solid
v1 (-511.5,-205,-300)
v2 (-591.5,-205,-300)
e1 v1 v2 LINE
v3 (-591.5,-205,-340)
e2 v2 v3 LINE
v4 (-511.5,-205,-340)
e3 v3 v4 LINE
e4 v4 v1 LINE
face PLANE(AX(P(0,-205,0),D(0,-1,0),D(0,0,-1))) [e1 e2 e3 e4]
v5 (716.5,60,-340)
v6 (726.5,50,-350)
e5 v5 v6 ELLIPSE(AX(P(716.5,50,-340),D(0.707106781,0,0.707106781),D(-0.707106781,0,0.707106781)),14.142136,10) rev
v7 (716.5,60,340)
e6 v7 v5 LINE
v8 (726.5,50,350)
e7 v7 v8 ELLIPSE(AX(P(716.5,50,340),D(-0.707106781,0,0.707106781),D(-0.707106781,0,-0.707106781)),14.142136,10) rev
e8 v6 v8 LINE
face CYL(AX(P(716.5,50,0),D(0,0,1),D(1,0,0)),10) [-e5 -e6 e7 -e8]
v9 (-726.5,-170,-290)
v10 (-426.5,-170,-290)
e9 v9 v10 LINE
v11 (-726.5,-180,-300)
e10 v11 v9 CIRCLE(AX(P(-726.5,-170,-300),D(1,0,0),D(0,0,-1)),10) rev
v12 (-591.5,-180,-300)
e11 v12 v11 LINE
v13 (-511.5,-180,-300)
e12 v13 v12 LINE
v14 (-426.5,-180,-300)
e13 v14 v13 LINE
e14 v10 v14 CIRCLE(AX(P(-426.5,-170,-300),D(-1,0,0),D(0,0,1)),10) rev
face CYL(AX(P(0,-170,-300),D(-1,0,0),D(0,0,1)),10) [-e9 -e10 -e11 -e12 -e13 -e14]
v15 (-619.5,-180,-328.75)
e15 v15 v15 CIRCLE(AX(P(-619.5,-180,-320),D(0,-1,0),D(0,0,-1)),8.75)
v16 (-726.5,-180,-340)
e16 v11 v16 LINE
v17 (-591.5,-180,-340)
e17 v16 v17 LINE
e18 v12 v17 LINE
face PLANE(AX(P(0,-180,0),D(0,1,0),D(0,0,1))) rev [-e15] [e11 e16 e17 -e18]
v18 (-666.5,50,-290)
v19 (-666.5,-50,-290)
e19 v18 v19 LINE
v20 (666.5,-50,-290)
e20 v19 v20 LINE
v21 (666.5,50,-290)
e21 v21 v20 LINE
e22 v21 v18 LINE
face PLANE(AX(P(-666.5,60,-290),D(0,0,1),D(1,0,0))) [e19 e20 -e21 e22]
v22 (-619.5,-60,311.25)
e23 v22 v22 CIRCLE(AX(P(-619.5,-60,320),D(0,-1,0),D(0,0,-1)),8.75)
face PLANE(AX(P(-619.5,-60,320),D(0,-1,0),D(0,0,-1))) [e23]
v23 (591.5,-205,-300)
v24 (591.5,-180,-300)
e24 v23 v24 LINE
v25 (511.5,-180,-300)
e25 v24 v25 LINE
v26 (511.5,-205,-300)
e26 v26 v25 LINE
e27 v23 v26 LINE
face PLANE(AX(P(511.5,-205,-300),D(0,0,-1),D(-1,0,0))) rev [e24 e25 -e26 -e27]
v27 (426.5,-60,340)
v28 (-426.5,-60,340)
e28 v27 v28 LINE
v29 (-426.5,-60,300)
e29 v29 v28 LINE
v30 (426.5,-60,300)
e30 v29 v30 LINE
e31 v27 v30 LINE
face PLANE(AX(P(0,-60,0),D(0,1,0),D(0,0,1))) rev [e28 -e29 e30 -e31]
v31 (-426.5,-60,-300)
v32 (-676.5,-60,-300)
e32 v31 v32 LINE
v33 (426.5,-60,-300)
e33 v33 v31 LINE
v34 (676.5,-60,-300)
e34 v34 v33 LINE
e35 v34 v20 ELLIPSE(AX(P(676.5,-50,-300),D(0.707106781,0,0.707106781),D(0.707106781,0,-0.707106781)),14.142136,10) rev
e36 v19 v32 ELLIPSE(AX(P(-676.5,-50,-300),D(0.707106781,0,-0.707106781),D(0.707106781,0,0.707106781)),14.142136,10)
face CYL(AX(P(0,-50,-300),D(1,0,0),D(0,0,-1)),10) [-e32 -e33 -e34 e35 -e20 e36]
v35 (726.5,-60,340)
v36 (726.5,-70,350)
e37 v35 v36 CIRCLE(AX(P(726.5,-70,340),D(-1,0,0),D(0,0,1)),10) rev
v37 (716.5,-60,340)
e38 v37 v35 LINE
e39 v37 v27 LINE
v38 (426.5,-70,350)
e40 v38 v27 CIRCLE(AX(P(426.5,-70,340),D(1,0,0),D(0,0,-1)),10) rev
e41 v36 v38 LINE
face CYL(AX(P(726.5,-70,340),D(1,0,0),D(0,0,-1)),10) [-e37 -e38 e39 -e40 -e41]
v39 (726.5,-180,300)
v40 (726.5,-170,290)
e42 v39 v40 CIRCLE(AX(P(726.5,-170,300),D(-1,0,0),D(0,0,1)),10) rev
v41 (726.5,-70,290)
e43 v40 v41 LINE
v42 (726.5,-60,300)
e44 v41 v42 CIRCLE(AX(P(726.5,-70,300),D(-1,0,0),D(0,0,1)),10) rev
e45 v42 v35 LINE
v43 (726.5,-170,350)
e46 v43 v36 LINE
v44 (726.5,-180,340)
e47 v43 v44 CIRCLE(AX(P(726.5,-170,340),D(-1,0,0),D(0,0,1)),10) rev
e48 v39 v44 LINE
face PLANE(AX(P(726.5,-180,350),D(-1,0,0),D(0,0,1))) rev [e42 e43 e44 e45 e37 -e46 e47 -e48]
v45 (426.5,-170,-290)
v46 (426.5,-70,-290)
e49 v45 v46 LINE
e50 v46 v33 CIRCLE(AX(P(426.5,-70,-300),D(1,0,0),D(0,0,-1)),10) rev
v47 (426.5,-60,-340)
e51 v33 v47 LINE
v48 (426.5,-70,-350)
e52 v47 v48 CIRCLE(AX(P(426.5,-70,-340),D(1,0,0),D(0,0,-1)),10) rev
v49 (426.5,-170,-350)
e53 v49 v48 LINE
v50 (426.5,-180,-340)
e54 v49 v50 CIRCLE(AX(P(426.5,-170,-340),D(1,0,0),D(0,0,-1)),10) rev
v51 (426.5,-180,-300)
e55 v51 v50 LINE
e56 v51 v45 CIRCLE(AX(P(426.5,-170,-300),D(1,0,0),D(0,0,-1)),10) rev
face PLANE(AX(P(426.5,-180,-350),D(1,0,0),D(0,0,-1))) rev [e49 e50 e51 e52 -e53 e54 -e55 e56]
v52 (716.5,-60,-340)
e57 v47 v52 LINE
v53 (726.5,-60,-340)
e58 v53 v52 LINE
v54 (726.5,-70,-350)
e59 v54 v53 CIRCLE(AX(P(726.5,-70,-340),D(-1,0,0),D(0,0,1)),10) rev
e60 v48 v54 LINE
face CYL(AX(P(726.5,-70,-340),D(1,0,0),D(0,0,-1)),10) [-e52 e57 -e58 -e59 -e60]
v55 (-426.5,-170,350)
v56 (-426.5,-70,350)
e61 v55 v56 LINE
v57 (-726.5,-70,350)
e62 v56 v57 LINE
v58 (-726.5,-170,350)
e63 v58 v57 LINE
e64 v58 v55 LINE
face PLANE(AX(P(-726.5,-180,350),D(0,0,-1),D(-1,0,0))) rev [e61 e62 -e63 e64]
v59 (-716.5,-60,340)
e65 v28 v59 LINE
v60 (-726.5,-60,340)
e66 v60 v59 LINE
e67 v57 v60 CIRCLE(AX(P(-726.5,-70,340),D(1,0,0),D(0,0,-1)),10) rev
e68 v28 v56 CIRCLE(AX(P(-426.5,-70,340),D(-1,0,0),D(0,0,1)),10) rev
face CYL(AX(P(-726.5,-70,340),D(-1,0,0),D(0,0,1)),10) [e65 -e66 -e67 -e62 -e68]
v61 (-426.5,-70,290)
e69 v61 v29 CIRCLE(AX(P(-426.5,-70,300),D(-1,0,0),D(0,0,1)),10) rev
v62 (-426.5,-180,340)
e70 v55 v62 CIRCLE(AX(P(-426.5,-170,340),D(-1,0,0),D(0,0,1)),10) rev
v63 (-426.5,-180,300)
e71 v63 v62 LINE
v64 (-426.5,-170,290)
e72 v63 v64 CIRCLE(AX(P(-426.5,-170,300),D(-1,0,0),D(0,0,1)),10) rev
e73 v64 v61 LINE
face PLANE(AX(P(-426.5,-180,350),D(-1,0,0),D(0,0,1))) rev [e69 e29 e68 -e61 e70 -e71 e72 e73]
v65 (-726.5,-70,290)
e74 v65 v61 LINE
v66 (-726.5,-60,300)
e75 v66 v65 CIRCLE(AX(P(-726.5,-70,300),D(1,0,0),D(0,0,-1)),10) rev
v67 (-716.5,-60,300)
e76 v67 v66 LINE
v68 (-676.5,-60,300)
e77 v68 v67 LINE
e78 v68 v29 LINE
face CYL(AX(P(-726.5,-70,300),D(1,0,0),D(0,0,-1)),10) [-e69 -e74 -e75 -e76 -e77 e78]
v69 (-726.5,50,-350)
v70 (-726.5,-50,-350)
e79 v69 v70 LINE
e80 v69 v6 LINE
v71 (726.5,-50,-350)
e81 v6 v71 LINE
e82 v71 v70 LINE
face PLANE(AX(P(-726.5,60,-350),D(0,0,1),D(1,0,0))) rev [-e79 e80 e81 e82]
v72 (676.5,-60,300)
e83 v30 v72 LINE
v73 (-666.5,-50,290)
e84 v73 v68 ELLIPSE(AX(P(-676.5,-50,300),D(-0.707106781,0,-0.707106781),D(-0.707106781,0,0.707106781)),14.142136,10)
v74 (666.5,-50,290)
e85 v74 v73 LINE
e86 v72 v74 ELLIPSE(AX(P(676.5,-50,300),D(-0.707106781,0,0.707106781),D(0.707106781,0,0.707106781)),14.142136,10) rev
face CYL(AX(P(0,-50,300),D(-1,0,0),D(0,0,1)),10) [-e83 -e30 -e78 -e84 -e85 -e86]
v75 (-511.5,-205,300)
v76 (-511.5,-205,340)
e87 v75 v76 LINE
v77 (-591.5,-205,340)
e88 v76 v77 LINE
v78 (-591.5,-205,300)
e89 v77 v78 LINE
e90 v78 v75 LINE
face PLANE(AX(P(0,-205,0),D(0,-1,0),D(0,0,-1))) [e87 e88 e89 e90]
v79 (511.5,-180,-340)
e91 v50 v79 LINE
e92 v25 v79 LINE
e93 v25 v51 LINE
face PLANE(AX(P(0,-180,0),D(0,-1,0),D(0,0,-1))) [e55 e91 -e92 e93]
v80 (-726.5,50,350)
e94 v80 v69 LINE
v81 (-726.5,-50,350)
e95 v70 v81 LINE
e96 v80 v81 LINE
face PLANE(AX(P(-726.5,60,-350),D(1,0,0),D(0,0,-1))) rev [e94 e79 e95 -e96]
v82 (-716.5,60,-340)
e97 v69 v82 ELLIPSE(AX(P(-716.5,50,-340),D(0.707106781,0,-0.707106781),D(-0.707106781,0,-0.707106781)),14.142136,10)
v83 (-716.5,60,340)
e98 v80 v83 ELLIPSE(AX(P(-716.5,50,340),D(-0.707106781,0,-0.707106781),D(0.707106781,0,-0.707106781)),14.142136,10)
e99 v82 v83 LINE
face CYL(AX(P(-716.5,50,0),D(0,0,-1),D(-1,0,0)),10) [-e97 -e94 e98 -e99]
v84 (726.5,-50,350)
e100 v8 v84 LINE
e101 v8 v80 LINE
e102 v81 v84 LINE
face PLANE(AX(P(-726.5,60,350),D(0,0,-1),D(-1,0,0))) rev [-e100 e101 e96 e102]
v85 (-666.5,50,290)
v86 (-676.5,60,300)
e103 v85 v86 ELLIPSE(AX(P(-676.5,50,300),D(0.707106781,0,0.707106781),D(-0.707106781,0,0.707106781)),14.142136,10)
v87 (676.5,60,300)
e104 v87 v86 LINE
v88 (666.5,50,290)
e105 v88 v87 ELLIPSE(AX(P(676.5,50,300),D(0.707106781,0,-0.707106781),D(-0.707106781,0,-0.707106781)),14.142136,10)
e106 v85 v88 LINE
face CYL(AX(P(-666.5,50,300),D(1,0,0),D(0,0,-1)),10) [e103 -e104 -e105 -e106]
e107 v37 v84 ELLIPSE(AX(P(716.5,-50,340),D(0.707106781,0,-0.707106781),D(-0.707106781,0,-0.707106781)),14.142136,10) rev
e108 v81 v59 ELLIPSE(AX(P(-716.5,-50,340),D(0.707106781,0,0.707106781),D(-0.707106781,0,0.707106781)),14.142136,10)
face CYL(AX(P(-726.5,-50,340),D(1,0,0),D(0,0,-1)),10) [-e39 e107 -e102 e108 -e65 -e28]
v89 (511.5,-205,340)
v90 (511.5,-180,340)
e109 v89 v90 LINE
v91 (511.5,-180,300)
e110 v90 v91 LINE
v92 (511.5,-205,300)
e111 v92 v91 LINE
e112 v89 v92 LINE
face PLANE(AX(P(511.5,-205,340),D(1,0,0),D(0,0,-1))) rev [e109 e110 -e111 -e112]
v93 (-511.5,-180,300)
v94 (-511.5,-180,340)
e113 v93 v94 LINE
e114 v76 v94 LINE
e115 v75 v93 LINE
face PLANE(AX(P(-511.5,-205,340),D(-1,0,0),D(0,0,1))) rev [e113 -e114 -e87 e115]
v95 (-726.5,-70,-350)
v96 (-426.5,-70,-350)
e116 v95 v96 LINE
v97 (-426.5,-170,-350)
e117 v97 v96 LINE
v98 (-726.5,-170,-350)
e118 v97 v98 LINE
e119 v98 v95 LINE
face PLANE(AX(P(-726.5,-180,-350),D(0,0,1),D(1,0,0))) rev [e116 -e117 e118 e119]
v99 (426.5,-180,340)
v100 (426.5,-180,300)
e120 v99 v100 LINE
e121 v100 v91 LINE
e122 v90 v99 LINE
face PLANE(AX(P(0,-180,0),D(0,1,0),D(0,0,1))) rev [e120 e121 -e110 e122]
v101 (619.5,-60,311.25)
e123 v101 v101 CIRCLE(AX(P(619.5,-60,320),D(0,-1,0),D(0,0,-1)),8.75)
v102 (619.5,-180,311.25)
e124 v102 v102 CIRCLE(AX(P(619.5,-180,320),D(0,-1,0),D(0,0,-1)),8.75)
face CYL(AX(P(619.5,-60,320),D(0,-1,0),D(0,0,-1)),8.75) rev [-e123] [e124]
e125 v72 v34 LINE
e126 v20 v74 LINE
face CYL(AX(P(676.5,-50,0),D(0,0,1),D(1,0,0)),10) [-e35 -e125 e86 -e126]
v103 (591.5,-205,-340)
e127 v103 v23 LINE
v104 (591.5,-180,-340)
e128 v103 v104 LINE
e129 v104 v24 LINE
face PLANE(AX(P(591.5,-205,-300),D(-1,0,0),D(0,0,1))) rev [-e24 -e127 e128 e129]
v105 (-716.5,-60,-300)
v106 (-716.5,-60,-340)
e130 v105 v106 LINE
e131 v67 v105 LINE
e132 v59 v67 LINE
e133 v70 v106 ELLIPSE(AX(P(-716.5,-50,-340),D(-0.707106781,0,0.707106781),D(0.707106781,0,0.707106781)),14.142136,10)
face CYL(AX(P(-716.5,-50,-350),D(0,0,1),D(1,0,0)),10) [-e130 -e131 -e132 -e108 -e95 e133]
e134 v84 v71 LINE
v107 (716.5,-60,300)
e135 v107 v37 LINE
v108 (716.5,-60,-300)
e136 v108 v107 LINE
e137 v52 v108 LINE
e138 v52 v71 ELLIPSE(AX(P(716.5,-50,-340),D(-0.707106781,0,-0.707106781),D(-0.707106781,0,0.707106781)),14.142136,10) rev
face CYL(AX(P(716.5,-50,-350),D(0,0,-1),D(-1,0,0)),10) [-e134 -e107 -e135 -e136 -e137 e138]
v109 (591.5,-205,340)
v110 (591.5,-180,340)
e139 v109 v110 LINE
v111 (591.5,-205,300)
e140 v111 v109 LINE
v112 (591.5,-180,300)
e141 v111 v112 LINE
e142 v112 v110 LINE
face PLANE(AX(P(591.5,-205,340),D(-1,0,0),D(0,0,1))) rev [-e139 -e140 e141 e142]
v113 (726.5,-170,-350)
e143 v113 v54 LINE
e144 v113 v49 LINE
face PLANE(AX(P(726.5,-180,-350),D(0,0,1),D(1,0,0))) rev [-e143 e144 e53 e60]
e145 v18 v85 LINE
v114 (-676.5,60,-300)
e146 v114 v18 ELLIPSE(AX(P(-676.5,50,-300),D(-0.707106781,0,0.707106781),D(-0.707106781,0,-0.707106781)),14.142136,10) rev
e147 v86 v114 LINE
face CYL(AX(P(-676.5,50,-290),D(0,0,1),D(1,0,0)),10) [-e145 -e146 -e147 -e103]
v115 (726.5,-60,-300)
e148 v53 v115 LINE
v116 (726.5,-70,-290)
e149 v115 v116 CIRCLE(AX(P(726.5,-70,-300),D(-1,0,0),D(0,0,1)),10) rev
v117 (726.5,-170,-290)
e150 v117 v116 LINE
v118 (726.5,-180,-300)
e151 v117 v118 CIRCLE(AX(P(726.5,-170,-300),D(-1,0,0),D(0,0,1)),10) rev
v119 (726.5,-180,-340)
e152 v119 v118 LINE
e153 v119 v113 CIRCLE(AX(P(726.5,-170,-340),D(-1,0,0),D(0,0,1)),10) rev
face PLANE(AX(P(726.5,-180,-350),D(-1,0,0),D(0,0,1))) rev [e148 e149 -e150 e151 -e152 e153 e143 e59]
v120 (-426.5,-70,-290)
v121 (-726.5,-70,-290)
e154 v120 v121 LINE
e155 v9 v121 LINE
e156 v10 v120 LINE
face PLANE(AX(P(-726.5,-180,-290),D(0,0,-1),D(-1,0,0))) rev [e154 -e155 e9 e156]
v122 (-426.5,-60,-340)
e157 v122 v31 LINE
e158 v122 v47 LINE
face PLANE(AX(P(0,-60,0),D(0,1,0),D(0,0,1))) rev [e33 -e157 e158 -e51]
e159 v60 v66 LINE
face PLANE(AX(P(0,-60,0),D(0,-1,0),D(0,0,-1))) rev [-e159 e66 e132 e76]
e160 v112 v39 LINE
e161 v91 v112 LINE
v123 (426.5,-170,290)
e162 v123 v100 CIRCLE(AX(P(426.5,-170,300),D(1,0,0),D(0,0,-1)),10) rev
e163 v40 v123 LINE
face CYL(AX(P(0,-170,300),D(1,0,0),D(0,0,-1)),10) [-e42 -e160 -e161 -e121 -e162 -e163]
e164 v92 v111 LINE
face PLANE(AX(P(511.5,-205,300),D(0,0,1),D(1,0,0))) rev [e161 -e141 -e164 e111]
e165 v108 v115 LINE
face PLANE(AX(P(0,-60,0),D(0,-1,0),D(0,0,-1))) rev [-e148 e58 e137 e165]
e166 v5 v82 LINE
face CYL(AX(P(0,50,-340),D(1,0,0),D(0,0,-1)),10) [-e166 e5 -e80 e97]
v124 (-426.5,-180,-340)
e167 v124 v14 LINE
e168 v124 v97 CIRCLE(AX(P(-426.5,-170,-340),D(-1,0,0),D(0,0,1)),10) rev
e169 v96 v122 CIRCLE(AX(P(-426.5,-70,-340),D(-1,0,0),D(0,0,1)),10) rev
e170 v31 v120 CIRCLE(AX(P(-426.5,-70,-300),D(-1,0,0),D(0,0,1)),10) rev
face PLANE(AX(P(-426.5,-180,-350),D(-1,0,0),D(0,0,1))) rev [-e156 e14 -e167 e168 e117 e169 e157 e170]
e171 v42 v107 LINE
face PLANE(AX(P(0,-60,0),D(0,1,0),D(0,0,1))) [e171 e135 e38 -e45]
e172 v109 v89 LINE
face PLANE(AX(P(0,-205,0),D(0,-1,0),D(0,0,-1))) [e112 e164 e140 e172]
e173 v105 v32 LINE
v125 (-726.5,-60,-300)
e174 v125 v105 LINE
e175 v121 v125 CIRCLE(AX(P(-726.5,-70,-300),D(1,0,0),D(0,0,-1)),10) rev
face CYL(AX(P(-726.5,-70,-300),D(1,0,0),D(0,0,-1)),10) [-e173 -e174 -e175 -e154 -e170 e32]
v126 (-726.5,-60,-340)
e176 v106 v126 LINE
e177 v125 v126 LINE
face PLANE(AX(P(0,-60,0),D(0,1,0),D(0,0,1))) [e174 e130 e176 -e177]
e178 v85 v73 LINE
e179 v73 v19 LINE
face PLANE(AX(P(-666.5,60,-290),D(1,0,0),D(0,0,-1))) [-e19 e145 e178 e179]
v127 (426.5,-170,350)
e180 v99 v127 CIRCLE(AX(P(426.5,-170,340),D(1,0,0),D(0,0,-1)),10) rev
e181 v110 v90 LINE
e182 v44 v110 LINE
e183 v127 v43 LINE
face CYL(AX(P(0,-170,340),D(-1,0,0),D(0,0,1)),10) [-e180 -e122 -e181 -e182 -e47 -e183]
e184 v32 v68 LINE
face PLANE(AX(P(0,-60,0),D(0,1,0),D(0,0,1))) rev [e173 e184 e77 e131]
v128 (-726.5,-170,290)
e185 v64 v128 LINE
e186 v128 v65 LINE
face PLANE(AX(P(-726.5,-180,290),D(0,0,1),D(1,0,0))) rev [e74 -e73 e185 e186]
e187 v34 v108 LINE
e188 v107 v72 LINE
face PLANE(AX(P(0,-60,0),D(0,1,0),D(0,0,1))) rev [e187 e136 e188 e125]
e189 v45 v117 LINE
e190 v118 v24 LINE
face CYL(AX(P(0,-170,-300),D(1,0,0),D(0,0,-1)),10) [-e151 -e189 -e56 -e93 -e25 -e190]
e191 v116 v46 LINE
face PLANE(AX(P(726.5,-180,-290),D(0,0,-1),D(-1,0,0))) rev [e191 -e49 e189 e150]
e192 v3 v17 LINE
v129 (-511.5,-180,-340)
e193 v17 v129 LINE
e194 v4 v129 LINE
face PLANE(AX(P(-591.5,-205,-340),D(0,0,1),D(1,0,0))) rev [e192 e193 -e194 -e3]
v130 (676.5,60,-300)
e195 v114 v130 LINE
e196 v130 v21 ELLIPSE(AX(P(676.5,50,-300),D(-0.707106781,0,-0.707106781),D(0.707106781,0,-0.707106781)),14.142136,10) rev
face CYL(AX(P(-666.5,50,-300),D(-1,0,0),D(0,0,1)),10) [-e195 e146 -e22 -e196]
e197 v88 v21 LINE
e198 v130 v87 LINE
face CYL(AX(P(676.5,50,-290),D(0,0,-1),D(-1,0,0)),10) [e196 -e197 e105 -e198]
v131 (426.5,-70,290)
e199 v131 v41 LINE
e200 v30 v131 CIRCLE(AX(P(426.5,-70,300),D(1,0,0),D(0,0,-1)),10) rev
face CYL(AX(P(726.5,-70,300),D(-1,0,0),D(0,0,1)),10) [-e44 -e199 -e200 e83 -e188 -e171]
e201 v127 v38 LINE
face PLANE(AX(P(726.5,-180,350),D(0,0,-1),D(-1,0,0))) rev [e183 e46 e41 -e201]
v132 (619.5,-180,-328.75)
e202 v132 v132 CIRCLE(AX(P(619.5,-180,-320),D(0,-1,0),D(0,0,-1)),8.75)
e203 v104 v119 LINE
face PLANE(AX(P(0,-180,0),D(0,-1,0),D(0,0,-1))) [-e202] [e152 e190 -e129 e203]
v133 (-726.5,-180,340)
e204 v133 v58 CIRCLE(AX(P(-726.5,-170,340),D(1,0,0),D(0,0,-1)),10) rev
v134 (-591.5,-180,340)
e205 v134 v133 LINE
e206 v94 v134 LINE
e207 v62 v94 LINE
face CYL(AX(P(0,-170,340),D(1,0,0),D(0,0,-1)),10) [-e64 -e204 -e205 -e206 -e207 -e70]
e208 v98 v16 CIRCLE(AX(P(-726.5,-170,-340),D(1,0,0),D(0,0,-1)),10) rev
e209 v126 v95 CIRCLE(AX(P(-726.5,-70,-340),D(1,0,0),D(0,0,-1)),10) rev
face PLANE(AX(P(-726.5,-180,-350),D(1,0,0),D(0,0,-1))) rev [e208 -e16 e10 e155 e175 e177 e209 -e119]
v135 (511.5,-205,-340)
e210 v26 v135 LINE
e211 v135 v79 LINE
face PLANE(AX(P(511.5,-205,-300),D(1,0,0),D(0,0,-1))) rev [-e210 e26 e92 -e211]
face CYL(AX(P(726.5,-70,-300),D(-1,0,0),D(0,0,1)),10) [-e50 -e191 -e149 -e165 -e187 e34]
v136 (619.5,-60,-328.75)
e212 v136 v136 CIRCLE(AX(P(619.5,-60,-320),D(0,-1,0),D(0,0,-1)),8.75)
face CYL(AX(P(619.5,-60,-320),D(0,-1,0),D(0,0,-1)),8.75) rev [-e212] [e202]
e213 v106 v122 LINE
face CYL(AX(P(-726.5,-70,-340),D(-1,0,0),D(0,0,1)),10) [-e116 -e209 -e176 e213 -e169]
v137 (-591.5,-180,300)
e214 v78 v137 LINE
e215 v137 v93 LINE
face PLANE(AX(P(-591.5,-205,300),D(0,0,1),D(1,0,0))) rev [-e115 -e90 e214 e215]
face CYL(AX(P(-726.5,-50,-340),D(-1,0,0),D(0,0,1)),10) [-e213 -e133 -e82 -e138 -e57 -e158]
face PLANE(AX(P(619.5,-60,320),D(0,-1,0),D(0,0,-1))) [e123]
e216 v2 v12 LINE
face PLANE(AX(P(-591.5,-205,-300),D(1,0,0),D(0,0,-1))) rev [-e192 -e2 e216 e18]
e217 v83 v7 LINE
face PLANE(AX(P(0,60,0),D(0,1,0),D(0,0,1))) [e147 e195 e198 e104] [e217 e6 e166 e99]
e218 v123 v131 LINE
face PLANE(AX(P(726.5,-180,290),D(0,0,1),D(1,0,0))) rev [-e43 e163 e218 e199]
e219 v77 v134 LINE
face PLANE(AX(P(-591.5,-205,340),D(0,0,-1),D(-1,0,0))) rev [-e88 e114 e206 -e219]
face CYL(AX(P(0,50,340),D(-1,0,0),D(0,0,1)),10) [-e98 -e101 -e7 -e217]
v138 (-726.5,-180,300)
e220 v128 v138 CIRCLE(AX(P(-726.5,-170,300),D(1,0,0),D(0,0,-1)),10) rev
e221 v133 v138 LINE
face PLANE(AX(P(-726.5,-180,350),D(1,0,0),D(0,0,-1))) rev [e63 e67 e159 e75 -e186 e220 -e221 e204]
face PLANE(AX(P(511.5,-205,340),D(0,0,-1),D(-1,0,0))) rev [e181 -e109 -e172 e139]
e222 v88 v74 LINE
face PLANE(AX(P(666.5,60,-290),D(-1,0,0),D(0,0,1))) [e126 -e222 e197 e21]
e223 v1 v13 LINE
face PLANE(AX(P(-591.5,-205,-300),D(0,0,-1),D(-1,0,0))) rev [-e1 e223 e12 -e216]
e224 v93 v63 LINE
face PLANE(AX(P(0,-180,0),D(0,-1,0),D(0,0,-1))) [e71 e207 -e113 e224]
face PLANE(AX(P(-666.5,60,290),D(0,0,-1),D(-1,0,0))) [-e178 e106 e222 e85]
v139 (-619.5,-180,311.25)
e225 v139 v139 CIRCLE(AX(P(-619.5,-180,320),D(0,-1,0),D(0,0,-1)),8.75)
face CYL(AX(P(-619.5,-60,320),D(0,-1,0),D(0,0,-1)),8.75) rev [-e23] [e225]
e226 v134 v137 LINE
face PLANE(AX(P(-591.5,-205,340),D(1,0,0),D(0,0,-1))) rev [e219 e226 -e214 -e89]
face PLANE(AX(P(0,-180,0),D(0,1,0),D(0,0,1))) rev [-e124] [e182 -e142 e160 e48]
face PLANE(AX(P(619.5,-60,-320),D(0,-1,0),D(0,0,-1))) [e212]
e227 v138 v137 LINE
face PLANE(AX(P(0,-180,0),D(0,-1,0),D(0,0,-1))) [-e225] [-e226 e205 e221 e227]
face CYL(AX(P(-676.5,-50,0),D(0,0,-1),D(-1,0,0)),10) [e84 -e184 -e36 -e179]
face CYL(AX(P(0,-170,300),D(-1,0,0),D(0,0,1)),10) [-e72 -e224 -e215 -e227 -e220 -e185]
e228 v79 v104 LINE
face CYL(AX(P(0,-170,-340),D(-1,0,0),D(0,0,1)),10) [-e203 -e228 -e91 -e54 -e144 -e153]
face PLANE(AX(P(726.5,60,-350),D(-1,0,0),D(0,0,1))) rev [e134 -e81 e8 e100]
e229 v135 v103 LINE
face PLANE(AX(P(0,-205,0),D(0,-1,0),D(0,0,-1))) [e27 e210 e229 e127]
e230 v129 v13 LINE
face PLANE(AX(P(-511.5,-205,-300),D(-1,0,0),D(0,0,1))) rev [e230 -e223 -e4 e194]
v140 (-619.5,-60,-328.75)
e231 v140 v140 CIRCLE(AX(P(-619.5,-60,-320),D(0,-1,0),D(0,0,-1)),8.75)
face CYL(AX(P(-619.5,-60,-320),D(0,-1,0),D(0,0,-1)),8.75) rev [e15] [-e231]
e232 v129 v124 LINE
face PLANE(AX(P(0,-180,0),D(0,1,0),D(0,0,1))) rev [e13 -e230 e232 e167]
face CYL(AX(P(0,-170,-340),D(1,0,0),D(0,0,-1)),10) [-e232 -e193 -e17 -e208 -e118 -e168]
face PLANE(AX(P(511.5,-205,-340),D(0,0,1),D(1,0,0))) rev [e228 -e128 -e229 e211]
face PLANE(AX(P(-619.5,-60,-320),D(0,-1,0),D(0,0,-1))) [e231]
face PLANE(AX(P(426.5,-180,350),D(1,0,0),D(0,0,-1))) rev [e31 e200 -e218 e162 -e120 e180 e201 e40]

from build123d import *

# Parameters (mm, degrees)
SKIZZE1_W                       = 1453
SKIZZE1_H                       = 700
SKIZZE1_W_2                     = 1333
SKIZZE1_H_2                     = 580
AUFSATZ_LINEAR_AUSTRAGEN1_DEPTH = 60
VERRUNDUNG1_R                   = 10
SKIZZE2_W                       = 300
SKIZZE2_H                       = 60
AUFSATZ_LINEAR_AUSTRAGEN2_DEPTH = 120
VERRUNDUNG3_R                   = 10
VERRUNDUNG4_R                   = 10
SKIZZE3_R                       = 8.75
SCHNITT_LINEAR_AUSTRAGEN1_DEPTH = 120
SKIZZE4_W                       = 80
SKIZZE4_H                       = 40
AUFSATZ_LINEAR_AUSTRAGEN3_DEPTH = 25


with BuildPart() as part:
    # Skizze1 → Aufsatz-Linear austragen1 (new, symmetric)
    with BuildSketch(Plane(origin=(0, 0, 0), x_dir=(1, 0, 0), z_dir=(0, 1, 0))):
        Rectangle(SKIZZE1_W, SKIZZE1_H)
        Rectangle(SKIZZE1_W_2, SKIZZE1_H_2, mode=Mode.SUBTRACT)
    extrude(amount=AUFSATZ_LINEAR_AUSTRAGEN1_DEPTH, both=True)

    # Verrundung1
    verrundung1_edges = [part.edges().sort_by_distance(p)[0] for p in [
        (726.5, 60, 0),
        (0, 60, -350),
        (-666.5, -60, 0),
        (0, -60, 290),
        (666.5, -60, 0),
        (0, -60, -290),
        (-666.5, 60, 0),
        (0, 60, 290),
        (666.5, 60, 0),
        (0, 60, -290),
        (-726.5, 60, 0),
        (0, -60, -350),
        (726.5, -60, 0),
        (0, -60, 350),
        (-726.5, -60, 0),
        (0, 60, 350),
    ]]
    fillet(verrundung1_edges, radius=VERRUNDUNG1_R)

    # Skizze2 → Aufsatz-Linear austragen2 (add)
    with BuildSketch(Plane.XZ.offset(60)):
        with Locations((-576.5, 320)):
            Rectangle(SKIZZE2_W, SKIZZE2_H)
        with Locations((576.5, 320)):
            Rectangle(SKIZZE2_W, SKIZZE2_H)
        with Locations((576.5, -320)):
            Rectangle(SKIZZE2_W, SKIZZE2_H)
        with Locations((-576.5, -320)):
            Rectangle(SKIZZE2_W, SKIZZE2_H)
    extrude(amount=AUFSATZ_LINEAR_AUSTRAGEN2_DEPTH)

    # Verrundung3
    verrundung3_edges = [part.edges().sort_by_distance(p)[0] for p in [
        (576.5, -180, 290),
        (576.5, -180, -290),
        (576.5, -180, -350),
        (-576.5, -180, -350),
        (-576.5, -180, -290),
        (-576.5, -180, 290),
        (-576.5, -180, 350),
        (576.5, -180, 350),
    ]]
    fillet(verrundung3_edges, radius=VERRUNDUNG3_R)

    # Verrundung4
    # the kernel refuses this fillet: 10 mm, written as the material it adds along each edge
    # the kernel refuses this fillet: 10 mm, written as the material it takes off along each edge
    with BuildSketch(Plane(origin=(691.5, -60, -290), x_dir=(0, 0, -1), z_dir=(1, 0, 0)), Plane(origin=(-691.5, -60, -290), x_dir=(0, -1, 0), z_dir=(-1, 0, 0))) as verrundung4_2_piece_1:
        with BuildLine():
            CenterArc((VERRUNDUNG4_R, -VERRUNDUNG4_R), VERRUNDUNG4_R, 90, 90)
            Line((0, -VERRUNDUNG4_R), (0, 0))
            Line((0, 0), (VERRUNDUNG4_R, 0))
        make_face()
    extrude(amount=60, mode=Mode.SUBTRACT)
    with BuildSketch(Plane(origin=(401.5, -60, -290), x_dir=(0, 0, -1), z_dir=(1, 0, 0)), Plane(origin=(-401.5, -60, -290), x_dir=(0, -1, 0), z_dir=(-1, 0, 0))) as verrundung4_2_piece_2:
        with BuildLine():
            CenterArc((VERRUNDUNG4_R, -VERRUNDUNG4_R), VERRUNDUNG4_R, 90, 90)
            Line((0, -VERRUNDUNG4_R), (0, 0))
            Line((0, 0), (VERRUNDUNG4_R, 0))
        make_face()
    extrude(amount=300, mode=Mode.SUBTRACT)
    with BuildSketch(Plane(origin=(751.5, -60, -350), x_dir=(0, 0, 1), z_dir=(-1, 0, 0)), Plane(origin=(-751.5, -60, 350), x_dir=(0, 0, -1), z_dir=(1, 0, 0))) as verrundung4_2_piece_3:
        with BuildLine():
            CenterArc((VERRUNDUNG4_R, -VERRUNDUNG4_R), VERRUNDUNG4_R, 90, 90)
            Line((0, -VERRUNDUNG4_R), (0, 0))
            Line((0, 0), (VERRUNDUNG4_R, 0))
        make_face()
    extrude(amount=350, mode=Mode.SUBTRACT)
    with BuildSketch(Plane(origin=(-751.5, -60, -350), x_dir=(0, 0, 1), z_dir=(1, 0, 0)), Plane(origin=(751.5, -60, 350), x_dir=(0, 0, -1), z_dir=(-1, 0, 0))) as verrundung4_2_piece_4:
        with BuildLine():
            CenterArc((VERRUNDUNG4_R, VERRUNDUNG4_R), VERRUNDUNG4_R, 180, 90)
            Line((0, VERRUNDUNG4_R), (0, 0))
            Line((0, 0), (VERRUNDUNG4_R, 0))
        make_face()
    extrude(amount=350, mode=Mode.SUBTRACT)
    with BuildSketch(Plane(origin=(-691.5, -60, 290), x_dir=(0, -1, 0), z_dir=(-1, 0, 0)), Plane(origin=(691.5, -60, 290), x_dir=(0, 0, 1), z_dir=(1, 0, 0))) as verrundung4_2_piece_5:
        with BuildLine():
            CenterArc((VERRUNDUNG4_R, VERRUNDUNG4_R), VERRUNDUNG4_R, 180, 90)
            Line((0, VERRUNDUNG4_R), (0, 0))
            Line((0, 0), (VERRUNDUNG4_R, 0))
        make_face()
    extrude(amount=60, mode=Mode.SUBTRACT)
    with BuildSketch(Plane(origin=(-401.5, -60, 290), x_dir=(0, -1, 0), z_dir=(-1, 0, 0)), Plane(origin=(401.5, -60, 290), x_dir=(0, 0, 1), z_dir=(1, 0, 0))) as verrundung4_2_piece_6:
        with BuildLine():
            CenterArc((VERRUNDUNG4_R, VERRUNDUNG4_R), VERRUNDUNG4_R, 180, 90)
            Line((0, VERRUNDUNG4_R), (0, 0))
            Line((0, 0), (VERRUNDUNG4_R, 0))
        make_face()
    extrude(amount=300, mode=Mode.SUBTRACT)

    # Skizze3 → Schnitt-Linear austragen1 (cut)
    with BuildSketch(Plane.XZ.offset(180)):
        with Locations(Location((-619.5, 320, 0), (0, 0, 270))):
            Circle(SKIZZE3_R)
        with Locations(Location((-619.5, -320, 0), (0, 0, 270))):
            Circle(SKIZZE3_R)
        with Locations(Location((619.5, 320, 0), (0, 0, 270))):
            Circle(SKIZZE3_R)
        with Locations(Location((619.5, -320, 0), (0, 0, 270))):
            Circle(SKIZZE3_R)
    extrude(amount=-SCHNITT_LINEAR_AUSTRAGEN1_DEPTH, mode=Mode.SUBTRACT)

    # Skizze4 → Aufsatz-Linear austragen3 (add)
    with BuildSketch(Plane.XZ.offset(180)):
        with Locations((-551.5, 320)):
            Rectangle(SKIZZE4_W, SKIZZE4_H)
        with Locations((551.5, 320)):
            Rectangle(SKIZZE4_W, SKIZZE4_H)
        with Locations((551.5, -320)):
            Rectangle(SKIZZE4_W, SKIZZE4_H)
        with Locations((-551.5, -320)):
            Rectangle(SKIZZE4_W, SKIZZE4_H)
    extrude(amount=AUFSATZ_LINEAR_AUSTRAGEN3_DEPTH)


solid = part.part
